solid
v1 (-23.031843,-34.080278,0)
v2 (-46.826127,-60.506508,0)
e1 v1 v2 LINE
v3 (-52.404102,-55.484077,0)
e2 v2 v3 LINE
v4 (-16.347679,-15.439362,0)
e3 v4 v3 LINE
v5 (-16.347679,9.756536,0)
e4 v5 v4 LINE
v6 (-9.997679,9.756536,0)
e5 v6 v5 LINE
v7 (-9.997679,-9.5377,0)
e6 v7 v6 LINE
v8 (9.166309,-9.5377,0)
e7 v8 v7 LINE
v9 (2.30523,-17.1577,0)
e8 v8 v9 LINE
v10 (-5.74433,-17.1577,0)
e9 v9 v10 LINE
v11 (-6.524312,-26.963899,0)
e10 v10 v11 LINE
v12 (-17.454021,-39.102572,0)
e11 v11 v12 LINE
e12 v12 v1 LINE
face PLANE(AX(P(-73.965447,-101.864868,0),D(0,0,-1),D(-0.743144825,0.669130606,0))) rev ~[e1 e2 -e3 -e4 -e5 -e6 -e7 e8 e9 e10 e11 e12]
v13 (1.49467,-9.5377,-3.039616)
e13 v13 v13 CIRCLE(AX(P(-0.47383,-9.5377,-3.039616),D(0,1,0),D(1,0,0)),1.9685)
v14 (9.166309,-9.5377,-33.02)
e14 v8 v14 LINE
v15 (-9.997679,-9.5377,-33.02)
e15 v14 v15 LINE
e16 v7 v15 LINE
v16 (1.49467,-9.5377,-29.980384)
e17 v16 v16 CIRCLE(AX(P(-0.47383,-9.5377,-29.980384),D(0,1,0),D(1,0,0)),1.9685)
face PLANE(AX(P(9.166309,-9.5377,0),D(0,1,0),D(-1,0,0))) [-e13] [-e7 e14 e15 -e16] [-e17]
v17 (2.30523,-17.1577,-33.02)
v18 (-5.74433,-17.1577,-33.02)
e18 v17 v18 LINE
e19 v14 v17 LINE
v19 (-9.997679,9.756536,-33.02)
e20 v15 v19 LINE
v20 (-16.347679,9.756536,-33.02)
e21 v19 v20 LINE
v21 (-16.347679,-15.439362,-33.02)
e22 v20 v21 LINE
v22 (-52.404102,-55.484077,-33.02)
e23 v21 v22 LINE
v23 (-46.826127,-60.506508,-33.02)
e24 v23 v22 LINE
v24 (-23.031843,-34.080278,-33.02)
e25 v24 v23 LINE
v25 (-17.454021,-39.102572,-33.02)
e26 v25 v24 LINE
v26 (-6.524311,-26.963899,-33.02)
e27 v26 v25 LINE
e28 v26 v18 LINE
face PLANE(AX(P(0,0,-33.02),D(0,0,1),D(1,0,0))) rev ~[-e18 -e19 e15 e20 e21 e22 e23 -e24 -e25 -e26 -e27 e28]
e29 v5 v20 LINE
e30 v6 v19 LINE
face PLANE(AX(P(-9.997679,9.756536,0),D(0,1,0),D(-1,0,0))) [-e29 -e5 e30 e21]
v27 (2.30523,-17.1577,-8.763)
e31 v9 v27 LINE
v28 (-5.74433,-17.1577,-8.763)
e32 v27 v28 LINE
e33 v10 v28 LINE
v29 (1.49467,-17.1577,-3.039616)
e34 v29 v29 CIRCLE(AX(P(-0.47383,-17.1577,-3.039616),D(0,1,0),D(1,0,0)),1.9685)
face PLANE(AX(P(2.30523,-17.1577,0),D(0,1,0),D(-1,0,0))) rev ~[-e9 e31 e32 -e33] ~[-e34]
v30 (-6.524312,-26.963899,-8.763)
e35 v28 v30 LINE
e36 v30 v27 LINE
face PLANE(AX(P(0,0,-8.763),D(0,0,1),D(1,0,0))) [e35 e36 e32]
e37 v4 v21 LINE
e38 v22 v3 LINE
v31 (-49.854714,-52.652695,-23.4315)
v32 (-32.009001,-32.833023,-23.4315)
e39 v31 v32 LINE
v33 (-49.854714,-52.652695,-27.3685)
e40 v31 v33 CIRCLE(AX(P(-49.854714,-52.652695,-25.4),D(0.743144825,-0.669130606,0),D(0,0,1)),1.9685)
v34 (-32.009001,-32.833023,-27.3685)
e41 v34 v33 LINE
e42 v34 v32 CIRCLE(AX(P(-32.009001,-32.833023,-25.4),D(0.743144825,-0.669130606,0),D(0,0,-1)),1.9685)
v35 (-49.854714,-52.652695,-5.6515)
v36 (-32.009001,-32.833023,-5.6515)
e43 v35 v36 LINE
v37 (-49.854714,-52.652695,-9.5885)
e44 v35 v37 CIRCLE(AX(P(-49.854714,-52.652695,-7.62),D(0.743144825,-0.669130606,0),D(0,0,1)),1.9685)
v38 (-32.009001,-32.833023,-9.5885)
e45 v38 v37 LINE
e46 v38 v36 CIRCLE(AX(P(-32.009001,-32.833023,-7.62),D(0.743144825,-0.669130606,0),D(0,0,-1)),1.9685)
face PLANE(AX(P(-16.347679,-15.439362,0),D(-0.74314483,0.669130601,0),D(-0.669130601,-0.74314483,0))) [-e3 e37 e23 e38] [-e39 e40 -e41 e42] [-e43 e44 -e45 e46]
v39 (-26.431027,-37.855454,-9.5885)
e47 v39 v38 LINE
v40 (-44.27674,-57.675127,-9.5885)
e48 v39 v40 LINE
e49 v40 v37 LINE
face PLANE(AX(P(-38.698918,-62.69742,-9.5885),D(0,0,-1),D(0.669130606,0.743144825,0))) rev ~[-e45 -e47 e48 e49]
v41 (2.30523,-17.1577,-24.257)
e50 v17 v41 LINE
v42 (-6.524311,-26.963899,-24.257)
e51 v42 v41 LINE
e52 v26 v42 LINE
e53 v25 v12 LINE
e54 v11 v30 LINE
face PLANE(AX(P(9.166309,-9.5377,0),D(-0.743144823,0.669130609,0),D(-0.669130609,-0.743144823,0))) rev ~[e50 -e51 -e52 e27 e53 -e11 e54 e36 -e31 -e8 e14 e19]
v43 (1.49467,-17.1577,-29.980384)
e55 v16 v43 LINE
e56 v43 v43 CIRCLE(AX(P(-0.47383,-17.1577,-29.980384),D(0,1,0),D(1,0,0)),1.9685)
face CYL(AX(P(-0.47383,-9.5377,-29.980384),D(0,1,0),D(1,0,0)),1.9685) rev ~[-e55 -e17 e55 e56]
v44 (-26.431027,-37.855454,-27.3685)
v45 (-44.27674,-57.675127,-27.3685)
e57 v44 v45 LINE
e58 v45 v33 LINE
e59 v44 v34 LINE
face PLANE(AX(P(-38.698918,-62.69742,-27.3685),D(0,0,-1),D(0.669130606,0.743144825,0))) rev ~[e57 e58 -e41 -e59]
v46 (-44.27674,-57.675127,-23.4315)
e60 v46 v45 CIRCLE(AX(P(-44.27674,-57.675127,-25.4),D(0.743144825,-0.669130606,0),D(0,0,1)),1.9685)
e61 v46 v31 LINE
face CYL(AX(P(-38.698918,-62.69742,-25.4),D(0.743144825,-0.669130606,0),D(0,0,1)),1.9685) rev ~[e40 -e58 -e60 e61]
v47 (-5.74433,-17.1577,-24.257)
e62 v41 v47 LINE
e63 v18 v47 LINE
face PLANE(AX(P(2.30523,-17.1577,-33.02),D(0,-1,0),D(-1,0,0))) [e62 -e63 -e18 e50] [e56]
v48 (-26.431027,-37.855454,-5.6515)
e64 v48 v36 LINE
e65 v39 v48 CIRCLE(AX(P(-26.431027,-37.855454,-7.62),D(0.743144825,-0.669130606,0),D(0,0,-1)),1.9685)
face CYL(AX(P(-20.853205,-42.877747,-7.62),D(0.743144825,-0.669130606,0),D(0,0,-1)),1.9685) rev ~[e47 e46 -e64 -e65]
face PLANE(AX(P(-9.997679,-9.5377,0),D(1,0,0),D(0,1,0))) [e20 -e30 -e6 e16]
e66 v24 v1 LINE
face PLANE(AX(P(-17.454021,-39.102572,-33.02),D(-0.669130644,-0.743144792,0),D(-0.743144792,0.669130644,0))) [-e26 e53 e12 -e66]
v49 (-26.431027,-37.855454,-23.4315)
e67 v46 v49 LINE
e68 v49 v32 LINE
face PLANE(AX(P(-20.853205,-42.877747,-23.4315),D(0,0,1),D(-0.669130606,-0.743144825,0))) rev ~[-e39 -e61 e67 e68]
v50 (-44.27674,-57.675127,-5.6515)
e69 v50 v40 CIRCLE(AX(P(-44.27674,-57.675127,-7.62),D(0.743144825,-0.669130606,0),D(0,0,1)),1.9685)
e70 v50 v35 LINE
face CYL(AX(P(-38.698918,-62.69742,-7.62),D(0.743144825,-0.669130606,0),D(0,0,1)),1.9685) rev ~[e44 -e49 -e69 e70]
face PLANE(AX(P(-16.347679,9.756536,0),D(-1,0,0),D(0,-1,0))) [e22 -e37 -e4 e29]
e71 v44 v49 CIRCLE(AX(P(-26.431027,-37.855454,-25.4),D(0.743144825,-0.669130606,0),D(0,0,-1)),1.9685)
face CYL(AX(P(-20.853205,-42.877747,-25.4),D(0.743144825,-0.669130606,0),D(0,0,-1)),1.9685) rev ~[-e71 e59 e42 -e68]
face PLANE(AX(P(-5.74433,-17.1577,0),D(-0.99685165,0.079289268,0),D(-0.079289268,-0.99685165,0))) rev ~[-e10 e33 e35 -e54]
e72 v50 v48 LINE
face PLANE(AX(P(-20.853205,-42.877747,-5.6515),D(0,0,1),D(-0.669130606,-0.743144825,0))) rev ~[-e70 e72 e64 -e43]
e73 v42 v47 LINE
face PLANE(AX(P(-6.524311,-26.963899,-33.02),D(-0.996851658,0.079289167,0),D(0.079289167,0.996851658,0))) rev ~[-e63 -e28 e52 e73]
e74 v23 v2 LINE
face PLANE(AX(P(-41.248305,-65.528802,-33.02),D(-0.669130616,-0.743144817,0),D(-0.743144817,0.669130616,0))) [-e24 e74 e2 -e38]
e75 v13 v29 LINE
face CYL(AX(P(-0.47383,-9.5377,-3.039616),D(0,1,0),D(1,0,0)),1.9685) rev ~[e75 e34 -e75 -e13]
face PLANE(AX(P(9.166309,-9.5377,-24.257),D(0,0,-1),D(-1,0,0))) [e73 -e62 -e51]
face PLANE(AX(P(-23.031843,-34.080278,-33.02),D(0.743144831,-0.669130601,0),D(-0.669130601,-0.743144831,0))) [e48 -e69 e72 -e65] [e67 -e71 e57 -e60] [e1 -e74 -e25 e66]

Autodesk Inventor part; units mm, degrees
ref_plane "YZ Plane" through (0, 0, 0) normal (1, 0, 0) x (0, 1, 0)
ref_plane "XZ Plane" through (0, 0, 0) normal (0, 1, 0) x (-1, 0, 0)
ref_plane "Work Plane1" through (0, 0, 0) normal (0, 0, 1) x (1, 0, 0)
sketch "Sketch1" plane through (0, 0, 0) normal (0, 0, 1) x (1, 0, 0)
  line L0 (4.129202, -9.5377) -> (6.406797, -9.5377) construction
  line L1 (9.525, -8.41296) -> (9.525, -7.435497) construction
  line L2 (-6.406797, 9.5123) -> (-4.129202, 9.5123) construction
  line L3 (-9.525, 4.116502) -> (-9.525, 6.394097) construction
  line L4 (9.314549, -9.373063) -> (-73.965447, -101.864868) construction
  line L5 (9.166309, -9.5377) -> (-73.965447, -101.864868)
  line L6 (-73.965447, -101.864868) -> (-85.121243, -91.820144)
  line L7 (6.33881, 9.756536) -> (-85.121243, -91.820144) construction
  line L8 (9.166309, -9.5377) -> (-9.997679, -9.5377)
  line L9 (-9.997679, -9.5377) -> (-9.997679, 9.756536)
  line L10 (-9.997679, 9.756536) -> (-16.347679, 9.756536)
  line L11 (-16.347679, 9.756536) -> (-16.347679, -15.439362)
  line L12 (-16.347679, -15.439362) -> (-85.121243, -91.820144)
  point P0 (0, 0)
  dimension "d0" = 124.46
  dimension "d1" = 48
  dimension "d5" = 6.35
ref_plane "Work Plane2" through (-4.445, -9.144, -33.02) normal (0, 0, -1) x (0, 1, 0)
extrude "Extrusion1" add sketch "Sketch1" against normal up to surface (33.02 mm away)
sketch "Sketch2" plane through (-73.965447, -101.864868, -33.02) normal (-0.6691306, -0.7431448, 0) x (0.7431448, -0.6691306, 0)
  line L0 (0, 33.02) -> (0, 0)
  line L1 (-15.011605, 33.02) -> (-15.011605, 0)
  line L2 (0, 0) -> (-15.011605, 0)
  line L3 (-15.011605, 0) -> (-15.011605, 26.67)
  line L4 (-15.011605, 26.67) -> (0, 26.67)
  line L5 (0, 26.67) -> (0, 0)
  line L6 (-15.011605, 33.02) -> (0, 33.02)
  point P0 (-13.193862, 33.02)
  dimension "d19" = 6.35
extrude "Extrusion2" cut sketch "Sketch2" against normal blind 25.4 contours L0 L2 L1 L4
sketch "Sketch3" plane through (-73.965447, -101.864868, -6.35) normal (0, 0, -1) x (-0.7431448, 0.6691306, 0)
  line L0 (19.8882, 12.0904) -> (19.8882, 3.175) construction
  line L1 (0, 25.4) -> (15.011605, 25.4) construction
  line L2 (15.011605, 0) -> (0, 0) construction
  line L3 (0, 0) -> (19.8882, 0) construction
  line L4 (19.8882, 0) -> (19.8882, 25.4) construction
  line L5 (19.8882, 25.4) -> (0, 25.4) construction
  line L6 (0, 25.4) -> (0, 0) construction
  line L7 (15.011605, 0) -> (19.8882, 0)
  line L8 (19.8882, 0) -> (19.8882, 25.4)
  line L9 (19.8882, 25.4) -> (15.011605, 25.4)
  line L10 (15.011605, 25.4) -> (15.011605, 0)
  point P0 (13.193862, 125.192894)
extrude "Extrusion3" add sketch "Sketch3" against normal up to surface (6.35 mm away)
sketch "Sketch4" plane through (0, 0, 0) normal (0, 0, 1) x (1, 0, 0)
  line L0 (-88.74526, -88.557064) -> (-71.749342, -69.681186) construction
  line L1 (-73.965447, -101.864868) -> (9.166309, -9.5377) construction
  line L2 (-74.314967, -94.50927) -> (-67.5166, -86.958918) construction
  line L3 (-73.965447, -101.864868) -> (-56.969529, -82.988989) construction
  line L4 (-73.965447, -101.864868) -> (-88.74526, -88.557064) construction
  line L5 (-81.390199, -88.138702) -> (-74.591832, -80.588351) construction
  line L6 (-74.314967, -94.50927) -> (-67.5166, -86.958918) construction
  line L7 (-73.144662, -95.563017) -> (-66.346296, -88.012665)
  line L8 (-68.686904, -85.905171) -> (-75.485271, -93.455523)
  arc A0 (-75.485271, -93.455523) -> (-73.144662, -95.563017) centre (-74.314967, -94.50927) ccw
  arc A1 (-66.346296, -88.012665) -> (-68.686904, -85.905171) centre (-67.5166, -86.958918) ccw
  line L9 (-81.390199, -88.138702) -> (-74.591832, -80.588351) construction
  line L10 (-80.219894, -89.192449) -> (-73.421527, -81.642098)
  line L11 (-75.762136, -79.534604) -> (-82.560503, -87.084955)
  arc A2 (-82.560503, -87.084955) -> (-80.219894, -89.192449) centre (-81.390199, -88.138702) ccw
  arc A3 (-73.421527, -81.642098) -> (-75.762136, -79.534604) centre (-74.591832, -80.588351) ccw
  point P0 (0, 0)
  point P1 (-70.915783, -90.734094)
  point P2 (-77.991015, -84.363527)
  dimension "d37" = 10.16
  dimension "d38" = 5.1816
  dimension "d39" = 5.2324
  dimension "d40" = 9.52066
  dimension "d41" = 3.1496
  dimension "d42" = 3.1496
extrude "Extrusion4" cut sketch "Sketch4" against normal through all
sketch "Sketch6" plane through (-9.997679, -9.5377, 0) normal (0, 1, 0) x (1, 0, 0)
  arc A0 (9.506526, 4.79213) -> (10.740649, 4.300966) centre (9.523849, 3.039616) ccw construction
  arc A1 (9.506526, 31.732899) -> (10.740649, 31.241734) centre (9.523849, 29.980384) ccw construction
  circle A2 centre (9.523849, 29.980384) radius 1.9685
  circle A3 centre (9.523849, 3.039616) radius 1.9685
  point P0 (9.997679, 0)
  dimension "d24" = 3.937
  dimension "d25" = 3.937
extrude "Extrusion6" cut sketch "Sketch6" against normal through all
sketch "Sketch7" plane through (9.166309, -9.5377, 0) normal (0.7431448, -0.6691306, 0) x (0, 0, -1)
  line L0 (33.02, -98.838459) -> (33.02, 0) construction
  line L1 (33.02, -9.525) -> (0, -9.525) construction
  point P0 (0, 0.954435)
sketch "Sketch8" plane through (9.166309, -9.5377, -33.02) normal (0, 0, -1) x (-1, 0, 0)
  line L0 (11.608639, 0) -> (11.608639, -12.892699) construction
  line L1 (66.135838, -73.451289) -> (0, 0) construction
  line L2 (11.608639, -7.62) -> (6.861079, -7.62) construction
  line L3 (0, 0) -> (19.163987, 0) construction
  line L4 (7.671639, 0) -> (7.671639, -8.520218) construction
  line L5 (14.910639, 0) -> (14.910639, -14.251905) construction
  line L6 (6.861079, -7.62) -> (14.910639, -7.62)
  line L7 (83.131755, -92.327168) -> (0, 0)
  line L8 (15.69062, -17.426199) -> (6.861079, -7.62)
  line L9 (15.69062, -17.426199) -> (14.910639, -7.62)
  point P0 (9.166309, 9.5377)
  dimension "d28" = 7.62
  dimension "d29" = 3.302
extrude "Extrusion7" cut sketch "Sketch8" against normal blind 8.763
sketch "Sketch9" plane through (0, 0, 0) normal (0, 0, 1) x (1, 0, 0)
  line L0 (2.30523, -17.1577) -> (-5.74433, -17.1577) construction
  line L1 (-5.74433, -17.1577) -> (-6.524312, -26.963899) construction
  line L2 (2.30523, -17.1577) -> (-6.524312, -26.963899)
  line L3 (-73.965447, -101.864868) -> (9.166309, -9.5377)
  line L4 (2.30523, -17.1577) -> (-5.74433, -17.1577)
  line L5 (-5.2705, -26.963899) -> (-5.2705, -17.1577)
  point P0 (0, 0)
sketch "Sketch9 outline for Extrusion8" plane through (0, 0, 0) normal (0, 0, 1) x (1, 0, 0)
  line L0 (-6.524312, -26.963899) -> (2.30523, -17.1577)
  line L1 (-5.74433, -17.1577) -> (-6.524312, -26.963899)
  line L2 (2.30523, -17.1577) -> (-5.74433, -17.1577)
extrude "Extrusion8" cut sketch "Sketch9 outline for Extrusion8" against normal blind 8.763
sketch "Sketch10" plane through (9.166309, -9.5377, -33.02) normal (0, 0, -1) x (-1, 0, 0)
  line L0 (25.513987, -5.901662) -> (77.291634, -63.406565)
  line L1 (67.094084, -52.081038) -> (55.938287, -62.125762)
  line L2 (66.135838, -73.451289) -> (15.69062, -17.426199) construction
  line L3 (40.913229, -45.438744) -> (36.5125, -40.551239) construction
  line L4 (66.135838, -73.451289) -> (77.291634, -63.406565) construction
  point P0 (9.166309, 9.5377)
  dimension "d34" = 15.24
sketch "Sketch11" plane through (-73.965447, -101.864868, -6.35) normal (0, 0, -1) x (-0.7431448, 0.6691306, 0)
  arc A0 (3.6068, 5.2324) -> (6.7564, 5.2324) centre (5.1816, 5.2324) ccw construction
  arc A1 (6.7564, 15.3924) -> (3.6068, 15.3924) centre (5.1816, 15.3924) ccw construction
  line L0 (5.1816, 5.2324) -> (5.1816, 15.3924) construction
  arc A2 (13.127463, 5.2324) -> (16.277063, 5.2324) centre (14.702263, 5.2324) ccw construction
  arc A3 (16.277063, 15.3924) -> (13.127463, 15.3924) centre (14.702263, 15.3924) ccw construction
  line L1 (14.702263, 5.2324) -> (14.702263, 15.3924) construction
  line L2 (14.702263, 5.2324) -> (14.702263, 15.3924) construction
  line L3 (17.877263, 5.2324) -> (17.877263, 15.3924)
  line L4 (11.527263, 15.3924) -> (11.527263, 5.2324)
  arc A4 (11.527263, 5.2324) -> (17.877263, 5.2324) centre (14.702263, 5.2324) ccw
  arc A5 (17.877263, 15.3924) -> (11.527263, 15.3924) centre (14.702263, 15.3924) ccw
  line L5 (5.1816, 5.2324) -> (5.1816, 15.3924) construction
  line L6 (8.3566, 5.2324) -> (8.3566, 15.3924)
  line L7 (2.0066, 15.3924) -> (2.0066, 5.2324)
  arc A6 (2.0066, 5.2324) -> (8.3566, 5.2324) centre (5.1816, 5.2324) ccw
  arc A7 (8.3566, 15.3924) -> (2.0066, 15.3924) centre (5.1816, 15.3924) ccw
  point P0 (13.193862, 125.192894)
  point P1 (14.702263, 10.3124)
  point P2 (5.1816, 10.3124)
  dimension "d43" = 6.35
  dimension "d44" = 6.35
extrude "Extrusion9" cut sketch "Sketch11" against normal blind 3.556
split body "Split1" sketch "Sketch10" result one side removed curves L1 removed pieces at (-50.542289, -75.103577, -13.123333)
sketch "Sketch13" plane through (9.166309, -9.5377, -33.02) normal (0, 0, -1) x (-1, 0, 0)
  line L0 (55.938287, -62.125762) -> (15.69062, -17.426199)
  line L1 (55.938287, -62.125762) -> (67.094084, -52.081038)
  line L2 (55.938287, -62.125762) -> (50.414614, -55.991102)
  line L3 (50.414614, -55.991102) -> (61.570411, -45.946377)
  line L4 (61.570411, -45.946377) -> (67.094084, -52.081038)
  line L5 (67.094084, -52.081038) -> (55.938287, -62.125762)
  point P0 (9.166309, 9.5377)
  dimension "d48" = 8.255
extrude "Extrusion10" cut sketch "Sketch13" against normal through all
sketch "Sketch15" plane through (9.166309, -9.5377, 0) normal (0.7431448, -0.6691306, 0) x (0, 0, -1)
  line L0 (7.62, -71.533459) -> (7.62, -44.863459) construction
  line L1 (0, -75.343459) -> (0, -23.449264) construction
  line L2 (0, -75.343459) -> (33.02, -75.343459) construction
  line L3 (25.4, -71.533459) -> (25.4, -44.863459) construction
  line L4 (33.02, -75.343459) -> (33.02, -23.449264) construction
  line L5 (7.62, -71.533459) -> (7.62, -44.863459) construction
  line L6 (9.5885, -71.533459) -> (9.5885, -44.863459)
  line L7 (5.6515, -44.863459) -> (5.6515, -71.533459)
  arc A0 (5.6515, -71.533459) -> (9.5885, -71.533459) centre (7.62, -71.533459) ccw
  arc A1 (9.5885, -44.863459) -> (5.6515, -44.863459) centre (7.62, -44.863459) ccw
  line L8 (25.4, -71.533459) -> (25.4, -44.863459) construction
  line L9 (27.3685, -71.533459) -> (27.3685, -44.863459)
  line L10 (23.4315, -44.863459) -> (23.4315, -71.533459)
  arc A2 (23.4315, -71.533459) -> (27.3685, -71.533459) centre (25.4, -71.533459) ccw
  arc A3 (27.3685, -44.863459) -> (23.4315, -44.863459) centre (25.4, -44.863459) ccw
  point P0 (0, 0.954435)
  point P1 (7.62, -58.198459)
  point P2 (25.4, -58.198459)
  dimension "d51" = 7.62
  dimension "d52" = 3.81
  dimension "d53" = 7.62
  dimension "d54" = 30.48
  dimension "d55" = 3.81
  dimension "d56" = 30.48
  dimension "d57" = 3.937
  dimension "d58" = 3.937
extrude "Extrusion11" cut sketch "Sketch15" against normal through all
sketch "Sketch16" plane through (9.166309, -9.5377, -33.02) normal (0, 0, -1) x (-1, 0, 0)
  line L0 (50.414614, -55.991102) -> (15.69062, -17.426199)
  line L1 (50.414614, -55.991102) -> (26.62033, -29.564872)
  line L2 (26.62033, -29.564872) -> (32.198152, -24.542578)
  line L3 (32.198152, -24.542578) -> (55.992436, -50.968808)
  line L4 (55.992436, -50.968808) -> (50.414614, -55.991102)
  point P0 (9.166309, 9.5377)
  dimension "d61" = 35.56
  dimension "d62" = 7.5057
extrude "Extrusion12" cut sketch "Sketch16" against normal through all
properties part number "arm stop 48 degree bottom half"
